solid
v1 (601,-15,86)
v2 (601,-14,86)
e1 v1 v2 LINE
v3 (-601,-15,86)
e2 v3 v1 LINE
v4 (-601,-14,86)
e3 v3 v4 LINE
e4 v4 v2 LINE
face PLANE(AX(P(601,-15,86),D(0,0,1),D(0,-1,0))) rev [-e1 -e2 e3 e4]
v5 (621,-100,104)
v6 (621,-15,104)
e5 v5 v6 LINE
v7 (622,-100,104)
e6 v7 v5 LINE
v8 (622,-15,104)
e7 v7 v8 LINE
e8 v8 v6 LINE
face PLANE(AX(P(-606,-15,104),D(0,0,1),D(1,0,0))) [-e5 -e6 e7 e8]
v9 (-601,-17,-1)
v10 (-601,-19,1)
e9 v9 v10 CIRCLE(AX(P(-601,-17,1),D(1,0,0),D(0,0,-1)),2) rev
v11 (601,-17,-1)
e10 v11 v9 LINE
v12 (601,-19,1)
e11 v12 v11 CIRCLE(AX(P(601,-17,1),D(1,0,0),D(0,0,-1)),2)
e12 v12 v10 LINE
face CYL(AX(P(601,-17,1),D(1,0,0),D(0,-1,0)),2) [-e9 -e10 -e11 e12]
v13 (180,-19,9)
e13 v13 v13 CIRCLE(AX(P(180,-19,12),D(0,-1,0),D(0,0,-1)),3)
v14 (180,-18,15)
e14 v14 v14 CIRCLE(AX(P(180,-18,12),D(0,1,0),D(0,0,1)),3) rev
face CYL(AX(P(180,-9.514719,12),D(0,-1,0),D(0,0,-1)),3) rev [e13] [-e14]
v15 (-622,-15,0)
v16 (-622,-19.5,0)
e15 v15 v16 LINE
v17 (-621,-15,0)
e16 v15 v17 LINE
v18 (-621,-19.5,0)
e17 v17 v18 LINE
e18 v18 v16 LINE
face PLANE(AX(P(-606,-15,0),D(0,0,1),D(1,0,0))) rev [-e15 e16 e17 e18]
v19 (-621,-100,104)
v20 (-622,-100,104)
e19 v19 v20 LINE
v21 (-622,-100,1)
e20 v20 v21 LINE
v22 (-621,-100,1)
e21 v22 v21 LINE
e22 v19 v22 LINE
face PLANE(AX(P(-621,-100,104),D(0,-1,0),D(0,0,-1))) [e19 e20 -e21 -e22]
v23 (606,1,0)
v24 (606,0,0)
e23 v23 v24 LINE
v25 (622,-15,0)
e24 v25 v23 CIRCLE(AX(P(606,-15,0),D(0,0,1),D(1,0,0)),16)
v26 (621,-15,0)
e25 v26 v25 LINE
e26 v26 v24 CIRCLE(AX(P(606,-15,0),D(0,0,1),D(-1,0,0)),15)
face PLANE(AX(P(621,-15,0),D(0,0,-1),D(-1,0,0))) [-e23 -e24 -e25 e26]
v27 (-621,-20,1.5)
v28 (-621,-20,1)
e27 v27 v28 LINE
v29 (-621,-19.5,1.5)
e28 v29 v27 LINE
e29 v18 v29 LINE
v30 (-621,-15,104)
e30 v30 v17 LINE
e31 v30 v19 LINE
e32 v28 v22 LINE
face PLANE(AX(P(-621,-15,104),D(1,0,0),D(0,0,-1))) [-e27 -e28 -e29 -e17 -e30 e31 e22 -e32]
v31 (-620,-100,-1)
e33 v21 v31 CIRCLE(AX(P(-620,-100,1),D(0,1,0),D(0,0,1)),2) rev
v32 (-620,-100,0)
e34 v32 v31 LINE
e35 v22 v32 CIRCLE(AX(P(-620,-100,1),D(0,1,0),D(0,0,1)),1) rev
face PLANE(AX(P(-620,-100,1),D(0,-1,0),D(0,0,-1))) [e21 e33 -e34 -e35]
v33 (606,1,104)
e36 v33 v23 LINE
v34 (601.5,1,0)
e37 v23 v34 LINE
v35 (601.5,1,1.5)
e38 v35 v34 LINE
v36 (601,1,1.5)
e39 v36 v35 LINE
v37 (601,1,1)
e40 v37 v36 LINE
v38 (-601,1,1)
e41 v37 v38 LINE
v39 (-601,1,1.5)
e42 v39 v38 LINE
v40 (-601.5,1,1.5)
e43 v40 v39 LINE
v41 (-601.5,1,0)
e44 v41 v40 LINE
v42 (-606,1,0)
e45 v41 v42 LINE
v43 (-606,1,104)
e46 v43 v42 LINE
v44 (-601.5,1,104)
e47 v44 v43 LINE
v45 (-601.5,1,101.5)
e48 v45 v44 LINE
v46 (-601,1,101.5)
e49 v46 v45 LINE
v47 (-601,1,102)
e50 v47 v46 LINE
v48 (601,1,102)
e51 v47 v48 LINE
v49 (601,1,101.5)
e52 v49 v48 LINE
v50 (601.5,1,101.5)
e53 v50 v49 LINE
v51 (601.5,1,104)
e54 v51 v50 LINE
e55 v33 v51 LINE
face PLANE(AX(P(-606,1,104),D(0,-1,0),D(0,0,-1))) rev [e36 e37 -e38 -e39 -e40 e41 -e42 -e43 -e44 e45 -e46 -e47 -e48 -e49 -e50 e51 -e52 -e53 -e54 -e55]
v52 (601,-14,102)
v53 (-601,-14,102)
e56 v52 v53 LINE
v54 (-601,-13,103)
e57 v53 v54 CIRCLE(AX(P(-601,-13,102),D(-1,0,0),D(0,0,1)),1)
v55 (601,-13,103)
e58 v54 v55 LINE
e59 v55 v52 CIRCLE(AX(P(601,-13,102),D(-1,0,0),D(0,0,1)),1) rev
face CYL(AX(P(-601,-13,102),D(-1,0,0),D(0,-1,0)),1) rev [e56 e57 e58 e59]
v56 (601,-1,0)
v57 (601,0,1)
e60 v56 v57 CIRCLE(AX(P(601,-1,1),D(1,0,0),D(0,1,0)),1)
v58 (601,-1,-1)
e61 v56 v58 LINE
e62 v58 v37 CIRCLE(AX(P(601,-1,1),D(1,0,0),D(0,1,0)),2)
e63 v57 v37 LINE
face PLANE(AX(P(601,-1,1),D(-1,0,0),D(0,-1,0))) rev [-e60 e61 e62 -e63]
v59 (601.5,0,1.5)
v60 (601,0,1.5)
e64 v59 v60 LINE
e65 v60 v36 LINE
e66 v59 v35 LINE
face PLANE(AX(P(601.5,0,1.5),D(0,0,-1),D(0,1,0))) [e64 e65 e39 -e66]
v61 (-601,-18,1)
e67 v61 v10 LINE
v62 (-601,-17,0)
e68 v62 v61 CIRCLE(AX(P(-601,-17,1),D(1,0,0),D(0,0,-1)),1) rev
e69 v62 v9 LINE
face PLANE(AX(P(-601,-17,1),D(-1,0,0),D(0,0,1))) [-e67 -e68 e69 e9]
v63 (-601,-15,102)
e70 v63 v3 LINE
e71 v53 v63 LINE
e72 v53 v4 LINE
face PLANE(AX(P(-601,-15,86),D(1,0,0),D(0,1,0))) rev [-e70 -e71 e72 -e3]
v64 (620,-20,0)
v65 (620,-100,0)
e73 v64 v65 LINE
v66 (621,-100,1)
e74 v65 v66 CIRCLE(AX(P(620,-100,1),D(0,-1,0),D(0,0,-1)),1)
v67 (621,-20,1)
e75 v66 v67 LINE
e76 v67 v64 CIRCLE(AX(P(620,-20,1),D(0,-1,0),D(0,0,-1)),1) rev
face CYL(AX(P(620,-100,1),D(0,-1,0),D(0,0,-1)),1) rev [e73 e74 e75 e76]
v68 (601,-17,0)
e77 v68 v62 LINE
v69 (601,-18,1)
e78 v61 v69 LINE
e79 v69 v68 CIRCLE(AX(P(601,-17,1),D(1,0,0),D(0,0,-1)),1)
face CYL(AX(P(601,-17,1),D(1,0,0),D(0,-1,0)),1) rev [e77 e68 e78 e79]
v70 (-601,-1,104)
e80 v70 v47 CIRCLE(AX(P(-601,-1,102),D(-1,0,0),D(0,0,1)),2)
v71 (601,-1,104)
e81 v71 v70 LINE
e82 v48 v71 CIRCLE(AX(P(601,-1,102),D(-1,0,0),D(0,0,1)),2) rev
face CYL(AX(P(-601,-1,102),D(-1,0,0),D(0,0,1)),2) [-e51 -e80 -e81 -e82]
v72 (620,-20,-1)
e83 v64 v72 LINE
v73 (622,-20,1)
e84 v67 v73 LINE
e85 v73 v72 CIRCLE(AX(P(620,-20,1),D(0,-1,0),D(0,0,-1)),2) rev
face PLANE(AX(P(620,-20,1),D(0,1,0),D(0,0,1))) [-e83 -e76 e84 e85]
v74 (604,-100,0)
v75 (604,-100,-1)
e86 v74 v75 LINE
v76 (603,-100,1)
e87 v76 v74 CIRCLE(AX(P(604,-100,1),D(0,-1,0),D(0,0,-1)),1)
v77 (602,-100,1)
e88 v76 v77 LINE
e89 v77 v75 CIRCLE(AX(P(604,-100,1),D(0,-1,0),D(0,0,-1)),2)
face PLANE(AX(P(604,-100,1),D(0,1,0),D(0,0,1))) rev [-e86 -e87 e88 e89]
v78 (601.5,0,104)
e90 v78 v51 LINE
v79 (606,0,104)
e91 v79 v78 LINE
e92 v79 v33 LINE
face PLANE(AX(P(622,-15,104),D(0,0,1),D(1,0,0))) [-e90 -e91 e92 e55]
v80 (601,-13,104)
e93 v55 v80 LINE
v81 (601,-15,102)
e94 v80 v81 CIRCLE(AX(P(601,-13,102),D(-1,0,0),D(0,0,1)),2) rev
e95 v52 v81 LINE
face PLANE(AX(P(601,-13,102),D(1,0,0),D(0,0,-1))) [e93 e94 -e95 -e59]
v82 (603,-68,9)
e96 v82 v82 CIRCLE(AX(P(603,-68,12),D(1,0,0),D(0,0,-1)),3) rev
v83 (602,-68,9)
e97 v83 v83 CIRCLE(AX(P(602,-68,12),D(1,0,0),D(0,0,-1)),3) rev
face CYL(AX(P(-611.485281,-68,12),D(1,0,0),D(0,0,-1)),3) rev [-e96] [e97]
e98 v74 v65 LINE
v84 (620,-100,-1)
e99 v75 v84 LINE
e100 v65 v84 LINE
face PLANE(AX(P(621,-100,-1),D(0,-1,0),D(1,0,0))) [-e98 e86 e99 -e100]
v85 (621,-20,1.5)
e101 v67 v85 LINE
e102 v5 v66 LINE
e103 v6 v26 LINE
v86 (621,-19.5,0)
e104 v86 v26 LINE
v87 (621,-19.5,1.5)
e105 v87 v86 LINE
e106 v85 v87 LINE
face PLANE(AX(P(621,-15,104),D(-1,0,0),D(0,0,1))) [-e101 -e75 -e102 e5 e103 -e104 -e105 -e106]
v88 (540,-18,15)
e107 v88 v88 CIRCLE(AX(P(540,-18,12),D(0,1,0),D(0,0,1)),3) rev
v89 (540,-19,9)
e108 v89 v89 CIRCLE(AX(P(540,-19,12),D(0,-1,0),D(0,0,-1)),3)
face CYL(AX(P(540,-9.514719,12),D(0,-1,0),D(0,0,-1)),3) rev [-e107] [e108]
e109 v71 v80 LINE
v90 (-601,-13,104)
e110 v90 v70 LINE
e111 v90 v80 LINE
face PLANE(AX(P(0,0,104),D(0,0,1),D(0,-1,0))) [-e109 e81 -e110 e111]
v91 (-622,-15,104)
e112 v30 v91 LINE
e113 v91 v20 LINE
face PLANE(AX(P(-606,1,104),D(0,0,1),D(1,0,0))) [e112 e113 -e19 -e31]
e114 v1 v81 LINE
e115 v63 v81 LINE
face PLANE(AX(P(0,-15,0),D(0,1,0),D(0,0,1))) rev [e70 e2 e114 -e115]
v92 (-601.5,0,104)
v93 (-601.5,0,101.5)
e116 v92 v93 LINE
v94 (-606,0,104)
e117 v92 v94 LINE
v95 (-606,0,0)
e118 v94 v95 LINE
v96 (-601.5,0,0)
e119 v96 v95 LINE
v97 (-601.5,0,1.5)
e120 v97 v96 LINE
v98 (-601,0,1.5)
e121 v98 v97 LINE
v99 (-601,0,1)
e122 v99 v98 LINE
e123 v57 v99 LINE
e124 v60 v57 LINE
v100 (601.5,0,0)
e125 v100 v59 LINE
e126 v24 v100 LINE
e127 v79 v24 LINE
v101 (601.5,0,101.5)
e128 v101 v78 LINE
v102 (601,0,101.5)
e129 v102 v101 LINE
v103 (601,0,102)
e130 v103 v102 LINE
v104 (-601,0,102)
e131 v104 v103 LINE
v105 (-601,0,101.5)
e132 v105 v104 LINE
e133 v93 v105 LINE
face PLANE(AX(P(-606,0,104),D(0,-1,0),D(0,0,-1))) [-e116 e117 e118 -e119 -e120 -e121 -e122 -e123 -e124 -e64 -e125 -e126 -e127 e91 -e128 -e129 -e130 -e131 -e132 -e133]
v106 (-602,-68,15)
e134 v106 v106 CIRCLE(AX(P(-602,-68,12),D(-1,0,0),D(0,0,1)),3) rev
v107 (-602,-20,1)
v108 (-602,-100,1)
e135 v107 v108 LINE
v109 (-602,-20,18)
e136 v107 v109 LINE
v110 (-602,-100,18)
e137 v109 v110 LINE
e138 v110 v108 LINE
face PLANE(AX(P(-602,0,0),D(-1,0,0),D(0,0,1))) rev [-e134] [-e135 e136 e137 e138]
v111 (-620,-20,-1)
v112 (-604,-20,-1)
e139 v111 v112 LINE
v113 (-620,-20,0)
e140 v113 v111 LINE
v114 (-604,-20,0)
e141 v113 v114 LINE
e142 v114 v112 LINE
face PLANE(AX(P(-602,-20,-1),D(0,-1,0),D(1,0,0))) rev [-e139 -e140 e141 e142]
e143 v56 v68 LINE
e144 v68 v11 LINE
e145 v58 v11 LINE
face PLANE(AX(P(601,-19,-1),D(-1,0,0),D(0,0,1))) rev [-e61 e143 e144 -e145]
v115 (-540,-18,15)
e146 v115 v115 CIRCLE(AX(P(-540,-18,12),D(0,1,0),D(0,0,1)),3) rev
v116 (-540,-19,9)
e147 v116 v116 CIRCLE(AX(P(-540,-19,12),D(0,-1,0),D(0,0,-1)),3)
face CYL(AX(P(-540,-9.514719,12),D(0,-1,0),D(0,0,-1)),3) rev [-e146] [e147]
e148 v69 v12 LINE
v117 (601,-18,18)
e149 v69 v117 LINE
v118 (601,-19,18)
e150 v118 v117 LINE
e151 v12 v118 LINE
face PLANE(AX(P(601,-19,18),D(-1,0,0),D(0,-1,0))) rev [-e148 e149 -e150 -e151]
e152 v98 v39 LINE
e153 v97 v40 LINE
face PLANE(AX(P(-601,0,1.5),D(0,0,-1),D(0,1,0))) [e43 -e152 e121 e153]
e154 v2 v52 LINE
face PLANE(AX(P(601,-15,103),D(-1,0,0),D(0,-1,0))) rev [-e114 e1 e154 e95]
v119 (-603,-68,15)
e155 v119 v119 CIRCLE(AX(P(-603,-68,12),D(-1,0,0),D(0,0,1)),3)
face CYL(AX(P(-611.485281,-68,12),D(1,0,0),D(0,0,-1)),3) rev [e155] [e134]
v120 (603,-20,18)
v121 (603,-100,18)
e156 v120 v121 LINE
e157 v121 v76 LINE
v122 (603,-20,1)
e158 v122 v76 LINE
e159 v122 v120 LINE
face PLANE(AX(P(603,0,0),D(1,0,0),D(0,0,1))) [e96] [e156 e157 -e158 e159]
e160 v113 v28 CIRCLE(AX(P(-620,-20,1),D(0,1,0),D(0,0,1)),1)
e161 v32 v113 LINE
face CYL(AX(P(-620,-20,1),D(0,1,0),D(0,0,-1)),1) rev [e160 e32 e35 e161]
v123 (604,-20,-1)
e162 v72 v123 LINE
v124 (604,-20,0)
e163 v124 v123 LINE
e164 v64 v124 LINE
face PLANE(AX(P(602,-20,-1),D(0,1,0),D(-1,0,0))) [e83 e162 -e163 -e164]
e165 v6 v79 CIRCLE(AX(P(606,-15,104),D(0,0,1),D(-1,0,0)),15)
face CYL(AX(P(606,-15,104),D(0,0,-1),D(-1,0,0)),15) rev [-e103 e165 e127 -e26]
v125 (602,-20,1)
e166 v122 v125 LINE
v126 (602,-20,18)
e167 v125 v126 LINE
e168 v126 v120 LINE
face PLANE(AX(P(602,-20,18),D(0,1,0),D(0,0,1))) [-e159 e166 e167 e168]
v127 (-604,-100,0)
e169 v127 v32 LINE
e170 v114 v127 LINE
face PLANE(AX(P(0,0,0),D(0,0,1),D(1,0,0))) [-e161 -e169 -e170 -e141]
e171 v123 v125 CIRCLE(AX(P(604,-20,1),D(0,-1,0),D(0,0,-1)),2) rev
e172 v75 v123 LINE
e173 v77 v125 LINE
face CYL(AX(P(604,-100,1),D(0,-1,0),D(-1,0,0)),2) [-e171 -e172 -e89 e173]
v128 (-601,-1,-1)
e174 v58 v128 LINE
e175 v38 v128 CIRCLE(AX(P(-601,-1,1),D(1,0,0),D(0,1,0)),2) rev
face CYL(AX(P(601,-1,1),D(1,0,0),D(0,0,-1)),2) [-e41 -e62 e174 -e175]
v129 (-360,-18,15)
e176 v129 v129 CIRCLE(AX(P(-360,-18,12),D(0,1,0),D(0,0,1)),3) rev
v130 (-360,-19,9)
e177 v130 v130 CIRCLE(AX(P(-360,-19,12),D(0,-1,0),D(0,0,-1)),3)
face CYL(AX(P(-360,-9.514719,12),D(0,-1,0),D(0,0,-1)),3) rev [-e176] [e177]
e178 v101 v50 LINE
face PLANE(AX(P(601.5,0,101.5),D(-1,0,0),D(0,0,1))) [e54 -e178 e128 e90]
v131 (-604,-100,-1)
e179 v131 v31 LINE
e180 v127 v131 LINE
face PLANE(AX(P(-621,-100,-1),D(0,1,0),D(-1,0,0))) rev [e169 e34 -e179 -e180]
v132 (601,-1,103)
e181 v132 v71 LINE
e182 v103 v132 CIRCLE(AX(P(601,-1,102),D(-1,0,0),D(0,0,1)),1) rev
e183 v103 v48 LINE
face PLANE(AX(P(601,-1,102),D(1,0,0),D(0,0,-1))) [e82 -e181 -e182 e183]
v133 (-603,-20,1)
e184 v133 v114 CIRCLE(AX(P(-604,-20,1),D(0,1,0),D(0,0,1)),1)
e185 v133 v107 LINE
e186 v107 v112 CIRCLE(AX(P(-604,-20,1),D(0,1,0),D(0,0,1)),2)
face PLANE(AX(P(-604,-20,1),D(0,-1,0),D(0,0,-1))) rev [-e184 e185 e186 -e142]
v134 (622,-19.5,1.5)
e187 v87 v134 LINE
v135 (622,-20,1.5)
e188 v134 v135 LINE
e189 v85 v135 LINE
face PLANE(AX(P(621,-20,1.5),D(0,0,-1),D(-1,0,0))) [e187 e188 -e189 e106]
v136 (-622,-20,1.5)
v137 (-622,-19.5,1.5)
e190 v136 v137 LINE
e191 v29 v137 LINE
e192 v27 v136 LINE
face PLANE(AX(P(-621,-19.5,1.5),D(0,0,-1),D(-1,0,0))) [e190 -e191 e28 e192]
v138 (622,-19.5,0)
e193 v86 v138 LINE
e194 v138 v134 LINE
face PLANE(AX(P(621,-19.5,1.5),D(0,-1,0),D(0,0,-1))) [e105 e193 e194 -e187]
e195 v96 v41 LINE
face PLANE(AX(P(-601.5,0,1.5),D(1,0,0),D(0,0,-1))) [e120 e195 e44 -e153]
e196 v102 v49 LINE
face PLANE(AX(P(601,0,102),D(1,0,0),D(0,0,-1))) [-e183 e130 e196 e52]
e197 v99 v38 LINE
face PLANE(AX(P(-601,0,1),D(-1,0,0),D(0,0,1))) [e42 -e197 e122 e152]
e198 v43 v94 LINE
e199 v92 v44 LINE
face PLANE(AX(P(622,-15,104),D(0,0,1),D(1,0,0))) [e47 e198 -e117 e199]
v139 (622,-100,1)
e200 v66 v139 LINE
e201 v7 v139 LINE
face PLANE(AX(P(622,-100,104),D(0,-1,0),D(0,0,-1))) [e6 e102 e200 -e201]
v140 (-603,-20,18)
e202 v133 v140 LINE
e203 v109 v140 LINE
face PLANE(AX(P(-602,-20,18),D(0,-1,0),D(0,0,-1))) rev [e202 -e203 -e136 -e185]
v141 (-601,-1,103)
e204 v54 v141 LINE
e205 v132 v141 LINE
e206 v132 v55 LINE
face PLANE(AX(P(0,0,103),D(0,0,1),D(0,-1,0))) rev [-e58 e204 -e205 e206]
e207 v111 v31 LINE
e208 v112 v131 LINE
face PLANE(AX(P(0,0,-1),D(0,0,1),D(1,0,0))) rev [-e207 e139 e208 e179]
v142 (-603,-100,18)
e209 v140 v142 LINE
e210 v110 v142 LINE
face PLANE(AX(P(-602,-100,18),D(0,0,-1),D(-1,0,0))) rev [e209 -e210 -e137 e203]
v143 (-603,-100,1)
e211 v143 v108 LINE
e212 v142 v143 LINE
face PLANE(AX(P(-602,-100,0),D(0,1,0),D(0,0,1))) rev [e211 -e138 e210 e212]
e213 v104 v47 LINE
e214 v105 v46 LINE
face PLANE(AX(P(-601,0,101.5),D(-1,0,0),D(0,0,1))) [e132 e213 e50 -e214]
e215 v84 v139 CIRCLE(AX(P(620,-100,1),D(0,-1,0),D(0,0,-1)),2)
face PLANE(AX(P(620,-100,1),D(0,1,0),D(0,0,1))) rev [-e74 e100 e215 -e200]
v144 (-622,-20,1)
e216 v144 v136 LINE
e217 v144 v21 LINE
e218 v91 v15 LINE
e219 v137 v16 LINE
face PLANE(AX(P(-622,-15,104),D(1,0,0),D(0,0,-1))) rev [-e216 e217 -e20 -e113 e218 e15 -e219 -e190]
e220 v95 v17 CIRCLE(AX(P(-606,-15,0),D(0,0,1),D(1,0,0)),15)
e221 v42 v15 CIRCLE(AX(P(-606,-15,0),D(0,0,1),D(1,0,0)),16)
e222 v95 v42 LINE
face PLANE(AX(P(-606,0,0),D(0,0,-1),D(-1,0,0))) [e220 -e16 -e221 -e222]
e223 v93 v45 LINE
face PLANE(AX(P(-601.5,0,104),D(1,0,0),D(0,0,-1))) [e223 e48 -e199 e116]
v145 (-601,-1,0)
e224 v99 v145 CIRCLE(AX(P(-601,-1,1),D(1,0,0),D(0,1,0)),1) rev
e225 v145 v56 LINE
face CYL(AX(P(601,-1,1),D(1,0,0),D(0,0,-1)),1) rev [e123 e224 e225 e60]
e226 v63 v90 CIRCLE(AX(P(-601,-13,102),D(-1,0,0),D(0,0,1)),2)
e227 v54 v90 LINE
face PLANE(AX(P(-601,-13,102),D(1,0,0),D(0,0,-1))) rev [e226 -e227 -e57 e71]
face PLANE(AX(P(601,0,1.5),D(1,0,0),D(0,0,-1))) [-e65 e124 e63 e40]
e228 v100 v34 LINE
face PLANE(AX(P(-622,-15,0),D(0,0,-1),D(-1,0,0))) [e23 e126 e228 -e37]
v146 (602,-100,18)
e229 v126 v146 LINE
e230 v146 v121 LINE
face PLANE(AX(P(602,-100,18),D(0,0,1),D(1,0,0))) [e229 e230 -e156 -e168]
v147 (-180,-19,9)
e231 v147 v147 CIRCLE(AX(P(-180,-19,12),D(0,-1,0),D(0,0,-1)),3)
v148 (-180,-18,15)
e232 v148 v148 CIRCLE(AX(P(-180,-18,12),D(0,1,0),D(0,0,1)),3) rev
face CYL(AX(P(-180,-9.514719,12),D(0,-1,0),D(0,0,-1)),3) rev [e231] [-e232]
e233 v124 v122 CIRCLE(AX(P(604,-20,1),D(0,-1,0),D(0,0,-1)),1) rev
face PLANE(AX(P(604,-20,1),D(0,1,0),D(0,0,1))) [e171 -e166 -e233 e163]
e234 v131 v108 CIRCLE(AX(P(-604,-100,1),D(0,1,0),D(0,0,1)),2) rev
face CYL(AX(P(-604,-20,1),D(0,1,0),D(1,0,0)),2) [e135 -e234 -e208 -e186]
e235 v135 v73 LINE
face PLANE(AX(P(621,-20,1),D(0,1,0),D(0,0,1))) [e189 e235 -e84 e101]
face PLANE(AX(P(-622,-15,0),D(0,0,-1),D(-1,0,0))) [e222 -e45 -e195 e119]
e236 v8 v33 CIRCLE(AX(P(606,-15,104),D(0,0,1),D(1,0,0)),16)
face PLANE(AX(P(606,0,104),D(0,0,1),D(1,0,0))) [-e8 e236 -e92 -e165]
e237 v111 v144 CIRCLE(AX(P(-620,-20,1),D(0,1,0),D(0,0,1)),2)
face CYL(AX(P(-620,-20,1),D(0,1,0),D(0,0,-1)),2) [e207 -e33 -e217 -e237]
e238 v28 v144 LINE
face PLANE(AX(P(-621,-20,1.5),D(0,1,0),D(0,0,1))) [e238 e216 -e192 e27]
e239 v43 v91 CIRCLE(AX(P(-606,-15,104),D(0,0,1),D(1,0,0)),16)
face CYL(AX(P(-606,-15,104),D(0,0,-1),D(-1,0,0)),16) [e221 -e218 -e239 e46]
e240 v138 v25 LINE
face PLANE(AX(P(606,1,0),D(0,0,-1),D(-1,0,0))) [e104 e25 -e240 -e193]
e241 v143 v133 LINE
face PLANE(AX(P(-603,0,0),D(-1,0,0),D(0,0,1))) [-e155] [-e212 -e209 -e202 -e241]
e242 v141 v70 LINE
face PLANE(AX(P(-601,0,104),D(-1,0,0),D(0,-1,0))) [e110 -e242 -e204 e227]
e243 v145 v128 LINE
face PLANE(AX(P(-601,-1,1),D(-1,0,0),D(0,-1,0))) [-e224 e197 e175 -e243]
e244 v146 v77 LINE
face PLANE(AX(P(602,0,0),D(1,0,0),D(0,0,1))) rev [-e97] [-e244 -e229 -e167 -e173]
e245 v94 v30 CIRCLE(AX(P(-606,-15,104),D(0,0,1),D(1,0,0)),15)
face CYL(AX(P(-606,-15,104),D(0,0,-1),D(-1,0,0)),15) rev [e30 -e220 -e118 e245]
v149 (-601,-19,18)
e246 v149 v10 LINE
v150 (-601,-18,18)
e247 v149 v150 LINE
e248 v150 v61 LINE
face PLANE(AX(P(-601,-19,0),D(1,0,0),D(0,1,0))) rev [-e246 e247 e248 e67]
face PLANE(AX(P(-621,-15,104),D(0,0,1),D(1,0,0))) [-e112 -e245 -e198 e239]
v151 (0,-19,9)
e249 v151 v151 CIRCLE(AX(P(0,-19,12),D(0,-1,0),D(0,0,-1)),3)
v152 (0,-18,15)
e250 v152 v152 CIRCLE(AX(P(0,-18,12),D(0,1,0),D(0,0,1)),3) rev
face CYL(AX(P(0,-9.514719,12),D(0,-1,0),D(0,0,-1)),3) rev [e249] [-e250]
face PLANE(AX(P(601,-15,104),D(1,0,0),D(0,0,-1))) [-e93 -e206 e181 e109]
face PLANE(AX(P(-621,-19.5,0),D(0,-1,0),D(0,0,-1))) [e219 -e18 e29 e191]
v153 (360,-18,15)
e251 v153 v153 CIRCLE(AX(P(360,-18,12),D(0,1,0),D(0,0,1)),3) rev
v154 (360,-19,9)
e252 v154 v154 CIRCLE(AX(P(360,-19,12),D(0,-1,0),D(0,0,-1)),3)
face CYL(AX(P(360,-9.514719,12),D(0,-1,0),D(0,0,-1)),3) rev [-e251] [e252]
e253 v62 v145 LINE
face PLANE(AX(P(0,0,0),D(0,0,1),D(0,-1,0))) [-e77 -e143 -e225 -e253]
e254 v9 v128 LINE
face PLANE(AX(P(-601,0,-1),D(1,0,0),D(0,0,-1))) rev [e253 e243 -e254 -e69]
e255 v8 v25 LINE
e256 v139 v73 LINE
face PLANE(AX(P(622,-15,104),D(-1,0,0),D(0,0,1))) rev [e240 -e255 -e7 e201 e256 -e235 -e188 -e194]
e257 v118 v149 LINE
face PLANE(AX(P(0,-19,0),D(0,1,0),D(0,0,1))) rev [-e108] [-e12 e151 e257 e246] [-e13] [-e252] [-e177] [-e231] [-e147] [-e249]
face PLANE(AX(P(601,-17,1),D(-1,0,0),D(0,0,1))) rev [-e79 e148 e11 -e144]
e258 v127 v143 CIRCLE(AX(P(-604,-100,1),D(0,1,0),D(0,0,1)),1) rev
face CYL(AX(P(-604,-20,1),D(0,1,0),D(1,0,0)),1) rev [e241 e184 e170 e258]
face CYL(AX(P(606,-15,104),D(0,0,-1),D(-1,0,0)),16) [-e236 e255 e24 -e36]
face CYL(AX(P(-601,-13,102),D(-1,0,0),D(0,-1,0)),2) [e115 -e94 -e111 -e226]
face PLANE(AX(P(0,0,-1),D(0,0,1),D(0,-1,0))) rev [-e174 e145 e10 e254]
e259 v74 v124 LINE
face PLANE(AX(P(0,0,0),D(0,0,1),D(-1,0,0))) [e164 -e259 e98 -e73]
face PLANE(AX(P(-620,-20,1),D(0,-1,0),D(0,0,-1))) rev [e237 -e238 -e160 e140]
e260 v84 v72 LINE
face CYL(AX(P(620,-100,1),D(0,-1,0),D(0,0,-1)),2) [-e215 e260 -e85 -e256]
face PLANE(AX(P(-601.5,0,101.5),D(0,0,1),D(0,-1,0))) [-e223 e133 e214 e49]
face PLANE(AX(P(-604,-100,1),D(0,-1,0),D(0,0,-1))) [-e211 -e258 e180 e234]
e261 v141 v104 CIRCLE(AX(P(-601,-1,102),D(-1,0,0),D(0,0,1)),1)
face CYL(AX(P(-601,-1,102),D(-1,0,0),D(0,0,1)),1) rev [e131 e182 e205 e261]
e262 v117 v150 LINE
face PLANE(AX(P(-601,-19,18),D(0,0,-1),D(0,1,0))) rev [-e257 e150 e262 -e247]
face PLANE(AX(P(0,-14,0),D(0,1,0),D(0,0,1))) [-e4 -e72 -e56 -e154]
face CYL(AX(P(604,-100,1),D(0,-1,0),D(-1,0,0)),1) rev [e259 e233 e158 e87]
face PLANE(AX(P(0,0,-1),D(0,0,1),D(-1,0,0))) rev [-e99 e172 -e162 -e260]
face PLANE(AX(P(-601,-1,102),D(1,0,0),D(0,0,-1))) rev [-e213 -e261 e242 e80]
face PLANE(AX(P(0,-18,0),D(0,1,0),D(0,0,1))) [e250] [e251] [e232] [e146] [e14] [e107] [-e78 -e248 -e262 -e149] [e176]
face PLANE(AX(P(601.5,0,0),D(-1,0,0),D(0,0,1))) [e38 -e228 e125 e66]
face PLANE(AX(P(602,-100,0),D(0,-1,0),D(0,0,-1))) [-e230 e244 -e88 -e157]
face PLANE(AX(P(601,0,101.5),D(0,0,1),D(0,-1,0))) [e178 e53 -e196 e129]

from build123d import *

# Parameters (mm, degrees)
BASE_FLANGE1_DEPTH             = 104
EDGE_FLANGE1_STRIP_W           = 6
EDGE_FLANGE1_STRIP_H           = 1
EDGE_FLANGE1_STRIP_CUT_DEPTH   = 1202
EDGE_FLANGE1_RELIEF_W          = 6.5
EDGE_FLANGE1_RELIEF_H          = 0.5
EDGE_FLANGE1_RELIEF_CUT_DEPTH  = 1
EDGE_FLANGE1_DEPTH             = 1202
EDGE_FLANGE2_STRIP_W           = 6
EDGE_FLANGE2_STRIP_H           = 1
EDGE_FLANGE2_STRIP_CUT_DEPTH   = 1202
EDGE_FLANGE2_DEPTH             = 1202
EDGE_FLANGE3_STRIP_W           = 6
EDGE_FLANGE3_STRIP_H           = 1
EDGE_FLANGE3_STRIP_CUT_DEPTH   = 80
EDGE_FLANGE3_RELIEF_W          = 6.5
EDGE_FLANGE3_RELIEF_H          = 0.5
EDGE_FLANGE3_RELIEF_CUT_DEPTH  = 1
EDGE_FLANGE3_DEPTH             = 80
EDGE_FLANGE4_STRIP_W           = 6
EDGE_FLANGE4_STRIP_H           = 1
EDGE_FLANGE4_STRIP_CUT_DEPTH   = 80
EDGE_FLANGE4_DEPTH             = 80
EDGE_FLANGE5_STRIP_W           = 6
EDGE_FLANGE5_STRIP_H           = 1
EDGE_FLANGE5_STRIP_CUT_DEPTH   = 1202
EDGE_FLANGE5_RELIEF_W          = 6.5
EDGE_FLANGE5_RELIEF_H          = 0.5
EDGE_FLANGE5_RELIEF_CUT_DEPTH  = 1
EDGE_FLANGE5_DEPTH             = 1202
SKETCH22_R                     = 3
CUT_EXTRUDE1_DEPTH             = 1
SKETCH23_R                     = 3
CUT_EXTRUDE2_DEPTH             = 3
CUT_EXTRUDE2_DIRECTION_2_REACH = 1234.474
EDGE_FLANGE6_STRIP_W           = 6
EDGE_FLANGE6_STRIP_H           = 1
EDGE_FLANGE6_STRIP_CUT_DEPTH   = 1202
EDGE_FLANGE6_DEPTH             = 1202


# Sheet-metal steps are written as plain solids
with BuildPart() as part:
    # Sketch1 → Base-Flange1 (new body)
    with BuildSketch(Plane.XY):
        with BuildLine():
            Line((-621, -100), (-621, -15))
            ThreePointArc((-621, -15), (-616.606601718, -4.393398282), (-606, 0))
            Line((-606, 0), (606, 0))
            ThreePointArc((606, 0), (616.606601718, -4.393398282), (621, -15))
            Line((621, -15), (621, -100))
            Line((621, -100), (622, -100))
            Line((622, -100), (622, -15))
            ThreePointArc((622, -15), (617.313708499, -3.686291501), (606, 1))
            Line((606, 1), (-606, 1))
            ThreePointArc((-606, 1), (-617.313708499, -3.686291501), (-622, -15))
            Line((-622, -15), (-622, -100))
            Line((-622, -100), (-621, -100))
        make_face()
    extrude(amount=BASE_FLANGE1_DEPTH)

    # Edge-Flange1 strip (across the edge) → Edge-Flange1 strip cut (cut)
    with BuildSketch(Plane(origin=(-601, 0, 0), x_dir=(0, 0, 1), z_dir=(1, 0, 0))):
        with Locations((-2, -0.5)):
            Rectangle(EDGE_FLANGE1_STRIP_W, EDGE_FLANGE1_STRIP_H)
    extrude(amount=EDGE_FLANGE1_STRIP_CUT_DEPTH, mode=Mode.SUBTRACT)

    # Edge-Flange1 relief (on the sheet) → Edge-Flange1 relief cut (cut)
    with BuildSketch(Plane(origin=(-601, 0, 1), x_dir=(0, 0, 1), z_dir=(0, -1, 0))):
        with Locations((-2.75, 0.25)):
            Rectangle(EDGE_FLANGE1_RELIEF_W, EDGE_FLANGE1_RELIEF_H)
        with Locations((-2.75, -1202.25)):
            Rectangle(EDGE_FLANGE1_RELIEF_W, EDGE_FLANGE1_RELIEF_H)
    extrude(amount=-EDGE_FLANGE1_RELIEF_CUT_DEPTH, mode=Mode.SUBTRACT)

    # Edge-Flange1 section (across the edge) → Edge-Flange1 (add)
    with BuildSketch(Plane(origin=(-601, 0, 0), x_dir=(0, 0, 1), z_dir=(1, 0, 0))):
        with BuildLine():
            Line((-1, 1), (-1, 19))
            Line((-1, 19), (0, 19))
            Line((0, 19), (0, 1))
            ThreePointArc((0, 1), (0.292893219, 0.292893219), (1, 0))
            Line((1, 0), (1, -1))
            ThreePointArc((1, -1), (-0.414213562, -0.414213562), (-1, 1))
        make_face()
    extrude(amount=EDGE_FLANGE1_DEPTH)

    # Edge-Flange2 strip (across the edge) → Edge-Flange2 strip cut (cut)
    with BuildSketch(Plane(origin=(-601, -19, 0), x_dir=(0, 1, 0), z_dir=(1, 0, 0))):
        with Locations((-1, -0.5)):
            Rectangle(EDGE_FLANGE2_STRIP_W, EDGE_FLANGE2_STRIP_H)
    extrude(amount=EDGE_FLANGE2_STRIP_CUT_DEPTH, mode=Mode.SUBTRACT)

    # Edge-Flange2 section (across the edge) → Edge-Flange2 (add)
    with BuildSketch(Plane(origin=(-601, -19, 0), x_dir=(0, 1, 0), z_dir=(1, 0, 0))):
        with BuildLine():
            Line((0, 1), (0, 18))
            Line((0, 18), (1, 18))
            Line((1, 18), (1, 1))
            ThreePointArc((1, 1), (1.292893219, 0.292893219), (2, 0))
            Line((2, 0), (2, -1))
            ThreePointArc((2, -1), (0.585786438, -0.414213562), (0, 1))
        make_face()
    extrude(amount=EDGE_FLANGE2_DEPTH)

    # Edge-Flange3 strip (across the edge) → Edge-Flange3 strip cut (cut)
    with BuildSketch(Plane(origin=(-621, -100, 0), x_dir=(0, 0, 1), z_dir=(0, 1, 0))):
        with Locations((-2, -0.5)):
            Rectangle(EDGE_FLANGE3_STRIP_W, EDGE_FLANGE3_STRIP_H)
    edge_flange3_strip_cut = extrude(amount=EDGE_FLANGE3_STRIP_CUT_DEPTH, mode=Mode.SUBTRACT)

    # Edge-Flange3 relief (on the sheet) → Edge-Flange3 relief cut (cut)
    with BuildSketch(Plane(origin=(-621, -100, 1), x_dir=(0, 0, 1), z_dir=(1, 0, 0))):
        with Locations((-2.75, -80.25)):
            Rectangle(EDGE_FLANGE3_RELIEF_W, EDGE_FLANGE3_RELIEF_H)
    edge_flange3_relief_cut = extrude(amount=-EDGE_FLANGE3_RELIEF_CUT_DEPTH, mode=Mode.SUBTRACT)

    # Edge-Flange3 section (across the edge) → Edge-Flange3 (add)
    with BuildSketch(Plane(origin=(-621, -100, 0), x_dir=(0, 0, 1), z_dir=(0, 1, 0))):
        with BuildLine():
            Line((-1, 1), (-1, 19))
            Line((-1, 19), (0, 19))
            Line((0, 19), (0, 1))
            ThreePointArc((0, 1), (0.292893219, 0.292893219), (1, 0))
            Line((1, 0), (1, -1))
            ThreePointArc((1, -1), (-0.414213562, -0.414213562), (-1, 1))
        make_face()
    edge_flange3 = extrude(amount=EDGE_FLANGE3_DEPTH)

    # Edge-Flange4 strip (across the edge) → Edge-Flange4 strip cut (cut)
    with BuildSketch(Plane(origin=(-602, -100, 0), x_dir=(-1, 0, 0), z_dir=(0, 1, 0))):
        with Locations((-1, -0.5)):
            Rectangle(EDGE_FLANGE4_STRIP_W, EDGE_FLANGE4_STRIP_H)
    edge_flange4_strip_cut = extrude(amount=EDGE_FLANGE4_STRIP_CUT_DEPTH, mode=Mode.SUBTRACT)

    # Edge-Flange4 section (across the edge) → Edge-Flange4 (add)
    with BuildSketch(Plane(origin=(-602, -100, 0), x_dir=(-1, 0, 0), z_dir=(0, 1, 0))):
        with BuildLine():
            Line((0, 1), (0, 18))
            Line((0, 18), (1, 18))
            Line((1, 18), (1, 1))
            ThreePointArc((1, 1), (1.292893219, 0.292893219), (2, 0))
            Line((2, 0), (2, -1))
            ThreePointArc((2, -1), (0.585786438, -0.414213562), (0, 1))
        make_face()
    edge_flange4 = extrude(amount=EDGE_FLANGE4_DEPTH)

    # Mirror1: Edge-Flange3 strip cut, Edge-Flange3 relief cut, Edge-Flange3, Edge-Flange4 strip cut, Edge-Flange4 across plane
    add(edge_flange3_strip_cut.mirror(Plane(origin=(0, 0, 0), x_dir=(0, 0, 1), z_dir=(1, 0, 0))), mode=Mode.SUBTRACT)
    add(edge_flange3_relief_cut.mirror(Plane(origin=(0, 0, 0), x_dir=(0, 0, 1), z_dir=(1, 0, 0))), mode=Mode.SUBTRACT)
    add(edge_flange3.mirror(Plane(origin=(0, 0, 0), x_dir=(0, 0, 1), z_dir=(1, 0, 0))))
    add(edge_flange4_strip_cut.mirror(Plane(origin=(0, 0, 0), x_dir=(0, 0, 1), z_dir=(1, 0, 0))), mode=Mode.SUBTRACT)
    add(edge_flange4.mirror(Plane(origin=(0, 0, 0), x_dir=(0, 0, 1), z_dir=(1, 0, 0))))

    # Edge-Flange5 strip (across the edge) → Edge-Flange5 strip cut (cut)
    with BuildSketch(Plane(origin=(601, 0, 104), x_dir=(0, 0, -1), z_dir=(-1, 0, 0))):
        with Locations((-1, -0.5)):
            Rectangle(EDGE_FLANGE5_STRIP_W, EDGE_FLANGE5_STRIP_H)
    extrude(amount=EDGE_FLANGE5_STRIP_CUT_DEPTH, mode=Mode.SUBTRACT)

    # Edge-Flange5 relief (on the sheet) → Edge-Flange5 relief cut (cut)
    with BuildSketch(Plane(origin=(601, 0, 102), x_dir=(0, 0, -1), z_dir=(0, -1, 0))):
        with Locations((-2.75, 0.25)):
            Rectangle(EDGE_FLANGE5_RELIEF_W, EDGE_FLANGE5_RELIEF_H)
        with Locations((-2.75, -1202.25)):
            Rectangle(EDGE_FLANGE5_RELIEF_W, EDGE_FLANGE5_RELIEF_H)
    extrude(amount=-EDGE_FLANGE5_RELIEF_CUT_DEPTH, mode=Mode.SUBTRACT)

    # Edge-Flange5 section (across the edge) → Edge-Flange5 (add)
    with BuildSketch(Plane(origin=(601, 0, 104), x_dir=(0, 0, -1), z_dir=(-1, 0, 0))):
        with BuildLine():
            Line((0, 1), (0, 15))
            Line((0, 15), (1, 15))
            Line((1, 15), (1, 1))
            ThreePointArc((1, 1), (1.292893219, 0.292893219), (2, 0))
            Line((2, 0), (2, -1))
            ThreePointArc((2, -1), (0.585786438, -0.414213562), (0, 1))
        make_face()
    extrude(amount=EDGE_FLANGE5_DEPTH)

    # Sketch22 → Cut-Extrude1 (cut)
    with BuildSketch(Plane.XZ.offset(19)):
        with Locations(Location((-540, 12, 0), (0, 0, 270))):
            Circle(SKETCH22_R)
        with Locations(Location((-360, 12, 0), (0, 0, 270))):
            Circle(SKETCH22_R)
        with Locations(Location((-180, 12, 0), (0, 0, 270))):
            Circle(SKETCH22_R)
        with Locations(Location((0, 12, 0), (0, 0, 270))):
            Circle(SKETCH22_R)
        with Locations(Location((180, 12, 0), (0, 0, 270))):
            Circle(SKETCH22_R)
        with Locations(Location((360, 12, 0), (0, 0, 270))):
            Circle(SKETCH22_R)
        with Locations(Location((540, 12, 0), (0, 0, 270))):
            Circle(SKETCH22_R)
    extrude(amount=-CUT_EXTRUDE1_DEPTH, mode=Mode.SUBTRACT)

    # Sketch23 → Cut-Extrude2 (cut)
    with BuildSketch(Plane.ZY.offset(-602)):
        with Locations(Location((12, -68, 0), (0, 0, 180))):
            Circle(SKETCH23_R)
    extrude(amount=-CUT_EXTRUDE2_DEPTH, mode=Mode.SUBTRACT)

    # Cut-Extrude2 direction 2: up to this face of the body (flat: up to its plane)
    cut_extrude2_direction_2_end = Plane(part.part.faces().sort_by_distance((-603, -60, 9.5))[0])
    # Sketch23 → Cut-Extrude2 direction 2 (cut, up to the picked face)
    with BuildSketch(Plane.ZY.offset(-602), mode=Mode.PRIVATE) as cut_extrude2_direction_2_sk1:
        with Locations(Location((12, -68, 0), (0, 0, 180))):
            Circle(SKETCH23_R)
    cut_extrude2_direction_2_tool1 = split(extrude(cut_extrude2_direction_2_sk1.sketch, amount=CUT_EXTRUDE2_DIRECTION_2_REACH, mode=Mode.PRIVATE), bisect_by=cut_extrude2_direction_2_end, keep=Keep.BOTH, mode=Mode.PRIVATE)
    add(cut_extrude2_direction_2_tool1.solids().sort_by(Axis((602, -68, 12), (-1, 0, 0)))[0], mode=Mode.SUBTRACT)

    # Edge-Flange6 strip (across the edge) → Edge-Flange6 strip cut (cut)
    with BuildSketch(Plane(origin=(601, -15, 103), x_dir=(0, 1, 0), z_dir=(-1, 0, 0))):
        with Locations((-1, -0.5)):
            Rectangle(EDGE_FLANGE6_STRIP_W, EDGE_FLANGE6_STRIP_H)
    extrude(amount=EDGE_FLANGE6_STRIP_CUT_DEPTH, mode=Mode.SUBTRACT)

    # Edge-Flange6 section (across the edge) → Edge-Flange6 (add)
    with BuildSketch(Plane(origin=(601, -15, 103), x_dir=(0, 1, 0), z_dir=(-1, 0, 0))):
        with BuildLine():
            Line((0, 1), (0, 17))
            Line((0, 17), (1, 17))
            Line((1, 17), (1, 1))
            ThreePointArc((1, 1), (1.292893219, 0.292893219), (2, 0))
            Line((2, 0), (2, -1))
            ThreePointArc((2, -1), (0.585786438, -0.414213562), (0, 1))
        make_face()
    extrude(amount=EDGE_FLANGE6_DEPTH)


solid = part.part
